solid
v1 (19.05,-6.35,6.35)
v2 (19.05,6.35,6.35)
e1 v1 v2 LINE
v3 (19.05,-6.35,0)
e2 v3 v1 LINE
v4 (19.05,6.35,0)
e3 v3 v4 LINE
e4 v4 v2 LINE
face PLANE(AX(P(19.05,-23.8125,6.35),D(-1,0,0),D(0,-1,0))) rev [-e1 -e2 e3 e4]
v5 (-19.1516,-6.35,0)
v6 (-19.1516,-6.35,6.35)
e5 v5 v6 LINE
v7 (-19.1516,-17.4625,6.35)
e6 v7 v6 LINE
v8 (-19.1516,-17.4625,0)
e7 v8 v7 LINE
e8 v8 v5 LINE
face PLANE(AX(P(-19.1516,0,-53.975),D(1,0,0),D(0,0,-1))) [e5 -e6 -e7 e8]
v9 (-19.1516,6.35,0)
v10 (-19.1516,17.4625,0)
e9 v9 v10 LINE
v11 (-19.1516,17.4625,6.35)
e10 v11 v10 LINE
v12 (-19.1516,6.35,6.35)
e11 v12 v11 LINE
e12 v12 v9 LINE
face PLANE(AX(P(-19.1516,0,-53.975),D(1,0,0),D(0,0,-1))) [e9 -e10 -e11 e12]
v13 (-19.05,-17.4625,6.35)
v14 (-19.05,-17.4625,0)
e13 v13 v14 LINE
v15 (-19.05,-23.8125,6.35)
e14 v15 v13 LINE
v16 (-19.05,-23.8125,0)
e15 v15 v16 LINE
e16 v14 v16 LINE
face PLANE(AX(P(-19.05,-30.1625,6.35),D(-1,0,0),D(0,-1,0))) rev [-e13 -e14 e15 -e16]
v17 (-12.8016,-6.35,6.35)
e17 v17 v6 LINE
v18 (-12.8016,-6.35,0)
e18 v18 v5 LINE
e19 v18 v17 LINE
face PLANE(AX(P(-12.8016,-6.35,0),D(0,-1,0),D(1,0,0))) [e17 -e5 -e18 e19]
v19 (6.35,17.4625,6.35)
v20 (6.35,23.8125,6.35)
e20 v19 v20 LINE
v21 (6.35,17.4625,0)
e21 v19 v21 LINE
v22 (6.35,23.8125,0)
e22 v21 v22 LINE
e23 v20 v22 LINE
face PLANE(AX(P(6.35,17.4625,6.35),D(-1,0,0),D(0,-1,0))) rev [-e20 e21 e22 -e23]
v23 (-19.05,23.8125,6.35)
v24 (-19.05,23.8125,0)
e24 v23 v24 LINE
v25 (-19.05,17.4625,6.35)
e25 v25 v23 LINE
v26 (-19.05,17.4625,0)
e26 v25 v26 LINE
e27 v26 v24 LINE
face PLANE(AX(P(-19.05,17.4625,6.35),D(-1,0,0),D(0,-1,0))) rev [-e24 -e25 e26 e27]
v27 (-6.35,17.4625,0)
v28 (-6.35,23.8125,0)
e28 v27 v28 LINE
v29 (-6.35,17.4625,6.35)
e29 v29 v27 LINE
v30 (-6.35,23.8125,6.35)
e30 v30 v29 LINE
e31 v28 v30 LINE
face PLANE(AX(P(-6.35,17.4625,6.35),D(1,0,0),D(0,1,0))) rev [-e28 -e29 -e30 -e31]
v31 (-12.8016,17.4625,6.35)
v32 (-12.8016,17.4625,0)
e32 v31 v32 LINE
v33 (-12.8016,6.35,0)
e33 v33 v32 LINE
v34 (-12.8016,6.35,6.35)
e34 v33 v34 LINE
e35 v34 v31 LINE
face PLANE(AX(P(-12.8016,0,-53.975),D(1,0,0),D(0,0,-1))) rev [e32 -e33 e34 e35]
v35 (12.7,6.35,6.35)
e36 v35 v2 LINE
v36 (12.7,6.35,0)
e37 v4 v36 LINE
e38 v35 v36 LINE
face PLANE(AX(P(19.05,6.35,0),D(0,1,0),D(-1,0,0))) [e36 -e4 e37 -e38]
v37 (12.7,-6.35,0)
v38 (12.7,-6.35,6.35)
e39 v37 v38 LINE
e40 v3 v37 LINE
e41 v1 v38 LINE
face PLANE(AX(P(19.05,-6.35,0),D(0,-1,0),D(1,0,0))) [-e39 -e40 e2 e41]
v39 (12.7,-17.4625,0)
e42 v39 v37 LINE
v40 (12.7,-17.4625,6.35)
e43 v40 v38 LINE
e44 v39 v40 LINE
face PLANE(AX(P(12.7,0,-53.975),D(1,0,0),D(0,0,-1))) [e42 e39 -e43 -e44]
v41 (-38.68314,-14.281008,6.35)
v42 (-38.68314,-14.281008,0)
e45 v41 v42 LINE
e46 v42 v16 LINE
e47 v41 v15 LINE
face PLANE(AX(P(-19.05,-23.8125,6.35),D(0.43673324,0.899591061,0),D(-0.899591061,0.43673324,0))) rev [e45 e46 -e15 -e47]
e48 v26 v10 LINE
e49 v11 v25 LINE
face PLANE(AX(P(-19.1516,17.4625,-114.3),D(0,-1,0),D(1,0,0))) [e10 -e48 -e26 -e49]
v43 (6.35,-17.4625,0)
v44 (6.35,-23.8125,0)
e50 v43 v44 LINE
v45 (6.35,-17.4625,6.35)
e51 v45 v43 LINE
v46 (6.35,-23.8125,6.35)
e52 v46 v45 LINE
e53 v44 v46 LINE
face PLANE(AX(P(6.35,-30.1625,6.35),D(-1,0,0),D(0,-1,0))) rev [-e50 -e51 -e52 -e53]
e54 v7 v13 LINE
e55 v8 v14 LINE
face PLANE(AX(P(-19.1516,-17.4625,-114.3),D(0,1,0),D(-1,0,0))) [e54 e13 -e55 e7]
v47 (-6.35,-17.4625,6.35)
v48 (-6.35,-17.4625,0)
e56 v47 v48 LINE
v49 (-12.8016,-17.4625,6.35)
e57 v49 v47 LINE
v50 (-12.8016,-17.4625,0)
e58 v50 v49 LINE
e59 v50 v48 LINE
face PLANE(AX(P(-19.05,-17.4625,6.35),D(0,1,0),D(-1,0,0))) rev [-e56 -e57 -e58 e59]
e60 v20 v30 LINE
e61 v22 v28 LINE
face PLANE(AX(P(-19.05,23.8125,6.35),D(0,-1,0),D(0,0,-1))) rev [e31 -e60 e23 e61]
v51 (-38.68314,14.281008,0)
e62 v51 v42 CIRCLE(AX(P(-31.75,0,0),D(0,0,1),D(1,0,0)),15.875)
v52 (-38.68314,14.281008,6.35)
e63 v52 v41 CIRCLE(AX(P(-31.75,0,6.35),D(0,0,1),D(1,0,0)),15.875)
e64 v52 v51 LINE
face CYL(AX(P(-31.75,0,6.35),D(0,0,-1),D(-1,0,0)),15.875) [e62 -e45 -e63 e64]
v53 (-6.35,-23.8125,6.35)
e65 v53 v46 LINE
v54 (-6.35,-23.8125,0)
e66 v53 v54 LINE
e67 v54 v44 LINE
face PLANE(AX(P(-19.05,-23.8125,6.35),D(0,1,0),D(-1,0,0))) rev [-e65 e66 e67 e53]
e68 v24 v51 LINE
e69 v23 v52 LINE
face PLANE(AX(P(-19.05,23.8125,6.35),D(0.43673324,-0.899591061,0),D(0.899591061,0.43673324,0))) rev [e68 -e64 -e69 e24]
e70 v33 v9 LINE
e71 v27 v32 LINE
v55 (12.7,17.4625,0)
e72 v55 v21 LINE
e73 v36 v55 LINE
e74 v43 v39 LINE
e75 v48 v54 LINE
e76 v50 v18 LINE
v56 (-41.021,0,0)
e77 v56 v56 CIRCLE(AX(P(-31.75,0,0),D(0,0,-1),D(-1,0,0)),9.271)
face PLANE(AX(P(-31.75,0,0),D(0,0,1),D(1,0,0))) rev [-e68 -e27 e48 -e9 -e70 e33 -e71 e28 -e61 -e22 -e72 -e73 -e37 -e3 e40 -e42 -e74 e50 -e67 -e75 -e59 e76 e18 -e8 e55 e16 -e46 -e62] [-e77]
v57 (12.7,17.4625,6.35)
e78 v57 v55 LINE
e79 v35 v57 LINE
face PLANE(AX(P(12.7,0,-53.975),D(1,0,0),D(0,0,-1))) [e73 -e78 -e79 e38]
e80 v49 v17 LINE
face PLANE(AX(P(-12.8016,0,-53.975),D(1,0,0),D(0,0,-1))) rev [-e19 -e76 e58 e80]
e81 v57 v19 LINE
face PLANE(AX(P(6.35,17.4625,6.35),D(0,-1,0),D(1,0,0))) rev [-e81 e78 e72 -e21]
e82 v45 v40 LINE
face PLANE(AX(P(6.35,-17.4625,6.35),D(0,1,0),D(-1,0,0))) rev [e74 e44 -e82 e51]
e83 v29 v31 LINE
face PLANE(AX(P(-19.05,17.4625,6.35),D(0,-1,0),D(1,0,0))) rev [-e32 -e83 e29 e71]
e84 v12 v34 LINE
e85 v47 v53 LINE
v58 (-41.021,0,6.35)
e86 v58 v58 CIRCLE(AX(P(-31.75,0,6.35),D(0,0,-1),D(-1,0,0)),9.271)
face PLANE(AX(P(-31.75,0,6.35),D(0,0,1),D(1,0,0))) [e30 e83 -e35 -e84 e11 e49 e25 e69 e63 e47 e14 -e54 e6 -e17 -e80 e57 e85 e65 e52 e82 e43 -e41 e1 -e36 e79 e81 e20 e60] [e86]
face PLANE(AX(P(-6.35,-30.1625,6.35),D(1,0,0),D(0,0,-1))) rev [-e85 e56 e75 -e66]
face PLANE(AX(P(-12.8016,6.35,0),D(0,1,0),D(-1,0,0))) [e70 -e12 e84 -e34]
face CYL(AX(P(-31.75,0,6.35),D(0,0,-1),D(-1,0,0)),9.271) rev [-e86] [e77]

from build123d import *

# Parameters (mm, degrees)
MASS_DEPTH          = 6.35
SKETCH4_R           = 9.271
CUT_EXTRUDE1_DEPTH  = 54.623672769
SKETCH3_W           = 12.7
SKETCH3_H           = 12.7
CUT_EXTRUDE2_DEPTH  = 54.623672769
LPATTERN1_COUNT     = 2
LPATTERN1_PITCH     = 25.4
CAVITY1_START       = -19.1516
CAVITY1_OUTLINE_W   = 11.1125
CAVITY1_OUTLINE_H   = 6.35
CAVITY1_DEPTH       = 6.35
CAVITY1_START_2     = 12.7
CAVITY1_2_OUTLINE_W = 11.1125
CAVITY1_2_OUTLINE_H = 6.35
CAVITY1_2_DEPTH     = 6.35


# Read off the part's stored shape, not the designer's step: Cavity1
with BuildPart() as part:
    # Sketch1 → Mass (new body)
    with BuildSketch(Plane.XY):
        with BuildLine():
            Line((-19.05, -23.8125), (19.05, -23.8125))
            Line((19.05, -23.8125), (19.05, 23.8125))
            Line((19.05, 23.8125), (-19.05, 23.8125))
            Line((-19.05, 23.8125), (-38.68314018, 14.281008096))
            ThreePointArc((-38.68314018, 14.281008096), (-47.625, 0), (-38.68314018, -14.281008096))
            Line((-38.68314018, -14.281008096), (-19.05, -23.8125))
        make_face()
    extrude(amount=MASS_DEPTH)

    # Sketch4 → Cut-Extrude1 (cut, through all)
    with BuildSketch(Plane(origin=(0, 0, 0), x_dir=(-1, 0, 0), z_dir=(0, 0, -1))):
        with Locations((31.75, 0)):
            Circle(SKETCH4_R)
    extrude(amount=-CUT_EXTRUDE1_DEPTH, mode=Mode.SUBTRACT)

    # Sketch3 → Cut-Extrude2 (cut, through all)
    with BuildSketch(Plane(origin=(0, 0, 0), x_dir=(-1, 0, 0), z_dir=(0, 0, -1))):
        with Locations((-12.7, 23.8125)):
            Rectangle(SKETCH3_W, SKETCH3_H)
        with Locations((-12.7, -23.8125)):
            Rectangle(SKETCH3_W, SKETCH3_H)
    cut_extrude2 = extrude(amount=-CUT_EXTRUDE2_DEPTH, mode=Mode.SUBTRACT)

    # LPattern1: Cut-Extrude2 ×2
    with Locations(*[(-i * LPATTERN1_PITCH, 0, 0) for i in range(1, LPATTERN1_COUNT)]):
        add(cut_extrude2, mode=Mode.SUBTRACT)

    # Cavity1 outline → Cavity1 (cut)
    with BuildSketch(Plane.YZ.offset(CAVITY1_START)):
        with Locations((-11.90625, 3.175)):
            Rectangle(CAVITY1_OUTLINE_W, CAVITY1_OUTLINE_H)
        with Locations((11.90625, 3.175)):
            Rectangle(CAVITY1_OUTLINE_W, CAVITY1_OUTLINE_H)
    extrude(amount=CAVITY1_DEPTH, mode=Mode.SUBTRACT)

    # Cavity1 2 outline → Cavity1 2 (cut)
    with BuildSketch(Plane.YZ.offset(CAVITY1_START_2)):
        with Locations((-11.90625, 3.175)):
            Rectangle(CAVITY1_2_OUTLINE_W, CAVITY1_2_OUTLINE_H)
        with Locations((11.90625, 3.175)):
            Rectangle(CAVITY1_2_OUTLINE_W, CAVITY1_2_OUTLINE_H)
    extrude(amount=CAVITY1_2_DEPTH, mode=Mode.SUBTRACT)


solid = part.part
